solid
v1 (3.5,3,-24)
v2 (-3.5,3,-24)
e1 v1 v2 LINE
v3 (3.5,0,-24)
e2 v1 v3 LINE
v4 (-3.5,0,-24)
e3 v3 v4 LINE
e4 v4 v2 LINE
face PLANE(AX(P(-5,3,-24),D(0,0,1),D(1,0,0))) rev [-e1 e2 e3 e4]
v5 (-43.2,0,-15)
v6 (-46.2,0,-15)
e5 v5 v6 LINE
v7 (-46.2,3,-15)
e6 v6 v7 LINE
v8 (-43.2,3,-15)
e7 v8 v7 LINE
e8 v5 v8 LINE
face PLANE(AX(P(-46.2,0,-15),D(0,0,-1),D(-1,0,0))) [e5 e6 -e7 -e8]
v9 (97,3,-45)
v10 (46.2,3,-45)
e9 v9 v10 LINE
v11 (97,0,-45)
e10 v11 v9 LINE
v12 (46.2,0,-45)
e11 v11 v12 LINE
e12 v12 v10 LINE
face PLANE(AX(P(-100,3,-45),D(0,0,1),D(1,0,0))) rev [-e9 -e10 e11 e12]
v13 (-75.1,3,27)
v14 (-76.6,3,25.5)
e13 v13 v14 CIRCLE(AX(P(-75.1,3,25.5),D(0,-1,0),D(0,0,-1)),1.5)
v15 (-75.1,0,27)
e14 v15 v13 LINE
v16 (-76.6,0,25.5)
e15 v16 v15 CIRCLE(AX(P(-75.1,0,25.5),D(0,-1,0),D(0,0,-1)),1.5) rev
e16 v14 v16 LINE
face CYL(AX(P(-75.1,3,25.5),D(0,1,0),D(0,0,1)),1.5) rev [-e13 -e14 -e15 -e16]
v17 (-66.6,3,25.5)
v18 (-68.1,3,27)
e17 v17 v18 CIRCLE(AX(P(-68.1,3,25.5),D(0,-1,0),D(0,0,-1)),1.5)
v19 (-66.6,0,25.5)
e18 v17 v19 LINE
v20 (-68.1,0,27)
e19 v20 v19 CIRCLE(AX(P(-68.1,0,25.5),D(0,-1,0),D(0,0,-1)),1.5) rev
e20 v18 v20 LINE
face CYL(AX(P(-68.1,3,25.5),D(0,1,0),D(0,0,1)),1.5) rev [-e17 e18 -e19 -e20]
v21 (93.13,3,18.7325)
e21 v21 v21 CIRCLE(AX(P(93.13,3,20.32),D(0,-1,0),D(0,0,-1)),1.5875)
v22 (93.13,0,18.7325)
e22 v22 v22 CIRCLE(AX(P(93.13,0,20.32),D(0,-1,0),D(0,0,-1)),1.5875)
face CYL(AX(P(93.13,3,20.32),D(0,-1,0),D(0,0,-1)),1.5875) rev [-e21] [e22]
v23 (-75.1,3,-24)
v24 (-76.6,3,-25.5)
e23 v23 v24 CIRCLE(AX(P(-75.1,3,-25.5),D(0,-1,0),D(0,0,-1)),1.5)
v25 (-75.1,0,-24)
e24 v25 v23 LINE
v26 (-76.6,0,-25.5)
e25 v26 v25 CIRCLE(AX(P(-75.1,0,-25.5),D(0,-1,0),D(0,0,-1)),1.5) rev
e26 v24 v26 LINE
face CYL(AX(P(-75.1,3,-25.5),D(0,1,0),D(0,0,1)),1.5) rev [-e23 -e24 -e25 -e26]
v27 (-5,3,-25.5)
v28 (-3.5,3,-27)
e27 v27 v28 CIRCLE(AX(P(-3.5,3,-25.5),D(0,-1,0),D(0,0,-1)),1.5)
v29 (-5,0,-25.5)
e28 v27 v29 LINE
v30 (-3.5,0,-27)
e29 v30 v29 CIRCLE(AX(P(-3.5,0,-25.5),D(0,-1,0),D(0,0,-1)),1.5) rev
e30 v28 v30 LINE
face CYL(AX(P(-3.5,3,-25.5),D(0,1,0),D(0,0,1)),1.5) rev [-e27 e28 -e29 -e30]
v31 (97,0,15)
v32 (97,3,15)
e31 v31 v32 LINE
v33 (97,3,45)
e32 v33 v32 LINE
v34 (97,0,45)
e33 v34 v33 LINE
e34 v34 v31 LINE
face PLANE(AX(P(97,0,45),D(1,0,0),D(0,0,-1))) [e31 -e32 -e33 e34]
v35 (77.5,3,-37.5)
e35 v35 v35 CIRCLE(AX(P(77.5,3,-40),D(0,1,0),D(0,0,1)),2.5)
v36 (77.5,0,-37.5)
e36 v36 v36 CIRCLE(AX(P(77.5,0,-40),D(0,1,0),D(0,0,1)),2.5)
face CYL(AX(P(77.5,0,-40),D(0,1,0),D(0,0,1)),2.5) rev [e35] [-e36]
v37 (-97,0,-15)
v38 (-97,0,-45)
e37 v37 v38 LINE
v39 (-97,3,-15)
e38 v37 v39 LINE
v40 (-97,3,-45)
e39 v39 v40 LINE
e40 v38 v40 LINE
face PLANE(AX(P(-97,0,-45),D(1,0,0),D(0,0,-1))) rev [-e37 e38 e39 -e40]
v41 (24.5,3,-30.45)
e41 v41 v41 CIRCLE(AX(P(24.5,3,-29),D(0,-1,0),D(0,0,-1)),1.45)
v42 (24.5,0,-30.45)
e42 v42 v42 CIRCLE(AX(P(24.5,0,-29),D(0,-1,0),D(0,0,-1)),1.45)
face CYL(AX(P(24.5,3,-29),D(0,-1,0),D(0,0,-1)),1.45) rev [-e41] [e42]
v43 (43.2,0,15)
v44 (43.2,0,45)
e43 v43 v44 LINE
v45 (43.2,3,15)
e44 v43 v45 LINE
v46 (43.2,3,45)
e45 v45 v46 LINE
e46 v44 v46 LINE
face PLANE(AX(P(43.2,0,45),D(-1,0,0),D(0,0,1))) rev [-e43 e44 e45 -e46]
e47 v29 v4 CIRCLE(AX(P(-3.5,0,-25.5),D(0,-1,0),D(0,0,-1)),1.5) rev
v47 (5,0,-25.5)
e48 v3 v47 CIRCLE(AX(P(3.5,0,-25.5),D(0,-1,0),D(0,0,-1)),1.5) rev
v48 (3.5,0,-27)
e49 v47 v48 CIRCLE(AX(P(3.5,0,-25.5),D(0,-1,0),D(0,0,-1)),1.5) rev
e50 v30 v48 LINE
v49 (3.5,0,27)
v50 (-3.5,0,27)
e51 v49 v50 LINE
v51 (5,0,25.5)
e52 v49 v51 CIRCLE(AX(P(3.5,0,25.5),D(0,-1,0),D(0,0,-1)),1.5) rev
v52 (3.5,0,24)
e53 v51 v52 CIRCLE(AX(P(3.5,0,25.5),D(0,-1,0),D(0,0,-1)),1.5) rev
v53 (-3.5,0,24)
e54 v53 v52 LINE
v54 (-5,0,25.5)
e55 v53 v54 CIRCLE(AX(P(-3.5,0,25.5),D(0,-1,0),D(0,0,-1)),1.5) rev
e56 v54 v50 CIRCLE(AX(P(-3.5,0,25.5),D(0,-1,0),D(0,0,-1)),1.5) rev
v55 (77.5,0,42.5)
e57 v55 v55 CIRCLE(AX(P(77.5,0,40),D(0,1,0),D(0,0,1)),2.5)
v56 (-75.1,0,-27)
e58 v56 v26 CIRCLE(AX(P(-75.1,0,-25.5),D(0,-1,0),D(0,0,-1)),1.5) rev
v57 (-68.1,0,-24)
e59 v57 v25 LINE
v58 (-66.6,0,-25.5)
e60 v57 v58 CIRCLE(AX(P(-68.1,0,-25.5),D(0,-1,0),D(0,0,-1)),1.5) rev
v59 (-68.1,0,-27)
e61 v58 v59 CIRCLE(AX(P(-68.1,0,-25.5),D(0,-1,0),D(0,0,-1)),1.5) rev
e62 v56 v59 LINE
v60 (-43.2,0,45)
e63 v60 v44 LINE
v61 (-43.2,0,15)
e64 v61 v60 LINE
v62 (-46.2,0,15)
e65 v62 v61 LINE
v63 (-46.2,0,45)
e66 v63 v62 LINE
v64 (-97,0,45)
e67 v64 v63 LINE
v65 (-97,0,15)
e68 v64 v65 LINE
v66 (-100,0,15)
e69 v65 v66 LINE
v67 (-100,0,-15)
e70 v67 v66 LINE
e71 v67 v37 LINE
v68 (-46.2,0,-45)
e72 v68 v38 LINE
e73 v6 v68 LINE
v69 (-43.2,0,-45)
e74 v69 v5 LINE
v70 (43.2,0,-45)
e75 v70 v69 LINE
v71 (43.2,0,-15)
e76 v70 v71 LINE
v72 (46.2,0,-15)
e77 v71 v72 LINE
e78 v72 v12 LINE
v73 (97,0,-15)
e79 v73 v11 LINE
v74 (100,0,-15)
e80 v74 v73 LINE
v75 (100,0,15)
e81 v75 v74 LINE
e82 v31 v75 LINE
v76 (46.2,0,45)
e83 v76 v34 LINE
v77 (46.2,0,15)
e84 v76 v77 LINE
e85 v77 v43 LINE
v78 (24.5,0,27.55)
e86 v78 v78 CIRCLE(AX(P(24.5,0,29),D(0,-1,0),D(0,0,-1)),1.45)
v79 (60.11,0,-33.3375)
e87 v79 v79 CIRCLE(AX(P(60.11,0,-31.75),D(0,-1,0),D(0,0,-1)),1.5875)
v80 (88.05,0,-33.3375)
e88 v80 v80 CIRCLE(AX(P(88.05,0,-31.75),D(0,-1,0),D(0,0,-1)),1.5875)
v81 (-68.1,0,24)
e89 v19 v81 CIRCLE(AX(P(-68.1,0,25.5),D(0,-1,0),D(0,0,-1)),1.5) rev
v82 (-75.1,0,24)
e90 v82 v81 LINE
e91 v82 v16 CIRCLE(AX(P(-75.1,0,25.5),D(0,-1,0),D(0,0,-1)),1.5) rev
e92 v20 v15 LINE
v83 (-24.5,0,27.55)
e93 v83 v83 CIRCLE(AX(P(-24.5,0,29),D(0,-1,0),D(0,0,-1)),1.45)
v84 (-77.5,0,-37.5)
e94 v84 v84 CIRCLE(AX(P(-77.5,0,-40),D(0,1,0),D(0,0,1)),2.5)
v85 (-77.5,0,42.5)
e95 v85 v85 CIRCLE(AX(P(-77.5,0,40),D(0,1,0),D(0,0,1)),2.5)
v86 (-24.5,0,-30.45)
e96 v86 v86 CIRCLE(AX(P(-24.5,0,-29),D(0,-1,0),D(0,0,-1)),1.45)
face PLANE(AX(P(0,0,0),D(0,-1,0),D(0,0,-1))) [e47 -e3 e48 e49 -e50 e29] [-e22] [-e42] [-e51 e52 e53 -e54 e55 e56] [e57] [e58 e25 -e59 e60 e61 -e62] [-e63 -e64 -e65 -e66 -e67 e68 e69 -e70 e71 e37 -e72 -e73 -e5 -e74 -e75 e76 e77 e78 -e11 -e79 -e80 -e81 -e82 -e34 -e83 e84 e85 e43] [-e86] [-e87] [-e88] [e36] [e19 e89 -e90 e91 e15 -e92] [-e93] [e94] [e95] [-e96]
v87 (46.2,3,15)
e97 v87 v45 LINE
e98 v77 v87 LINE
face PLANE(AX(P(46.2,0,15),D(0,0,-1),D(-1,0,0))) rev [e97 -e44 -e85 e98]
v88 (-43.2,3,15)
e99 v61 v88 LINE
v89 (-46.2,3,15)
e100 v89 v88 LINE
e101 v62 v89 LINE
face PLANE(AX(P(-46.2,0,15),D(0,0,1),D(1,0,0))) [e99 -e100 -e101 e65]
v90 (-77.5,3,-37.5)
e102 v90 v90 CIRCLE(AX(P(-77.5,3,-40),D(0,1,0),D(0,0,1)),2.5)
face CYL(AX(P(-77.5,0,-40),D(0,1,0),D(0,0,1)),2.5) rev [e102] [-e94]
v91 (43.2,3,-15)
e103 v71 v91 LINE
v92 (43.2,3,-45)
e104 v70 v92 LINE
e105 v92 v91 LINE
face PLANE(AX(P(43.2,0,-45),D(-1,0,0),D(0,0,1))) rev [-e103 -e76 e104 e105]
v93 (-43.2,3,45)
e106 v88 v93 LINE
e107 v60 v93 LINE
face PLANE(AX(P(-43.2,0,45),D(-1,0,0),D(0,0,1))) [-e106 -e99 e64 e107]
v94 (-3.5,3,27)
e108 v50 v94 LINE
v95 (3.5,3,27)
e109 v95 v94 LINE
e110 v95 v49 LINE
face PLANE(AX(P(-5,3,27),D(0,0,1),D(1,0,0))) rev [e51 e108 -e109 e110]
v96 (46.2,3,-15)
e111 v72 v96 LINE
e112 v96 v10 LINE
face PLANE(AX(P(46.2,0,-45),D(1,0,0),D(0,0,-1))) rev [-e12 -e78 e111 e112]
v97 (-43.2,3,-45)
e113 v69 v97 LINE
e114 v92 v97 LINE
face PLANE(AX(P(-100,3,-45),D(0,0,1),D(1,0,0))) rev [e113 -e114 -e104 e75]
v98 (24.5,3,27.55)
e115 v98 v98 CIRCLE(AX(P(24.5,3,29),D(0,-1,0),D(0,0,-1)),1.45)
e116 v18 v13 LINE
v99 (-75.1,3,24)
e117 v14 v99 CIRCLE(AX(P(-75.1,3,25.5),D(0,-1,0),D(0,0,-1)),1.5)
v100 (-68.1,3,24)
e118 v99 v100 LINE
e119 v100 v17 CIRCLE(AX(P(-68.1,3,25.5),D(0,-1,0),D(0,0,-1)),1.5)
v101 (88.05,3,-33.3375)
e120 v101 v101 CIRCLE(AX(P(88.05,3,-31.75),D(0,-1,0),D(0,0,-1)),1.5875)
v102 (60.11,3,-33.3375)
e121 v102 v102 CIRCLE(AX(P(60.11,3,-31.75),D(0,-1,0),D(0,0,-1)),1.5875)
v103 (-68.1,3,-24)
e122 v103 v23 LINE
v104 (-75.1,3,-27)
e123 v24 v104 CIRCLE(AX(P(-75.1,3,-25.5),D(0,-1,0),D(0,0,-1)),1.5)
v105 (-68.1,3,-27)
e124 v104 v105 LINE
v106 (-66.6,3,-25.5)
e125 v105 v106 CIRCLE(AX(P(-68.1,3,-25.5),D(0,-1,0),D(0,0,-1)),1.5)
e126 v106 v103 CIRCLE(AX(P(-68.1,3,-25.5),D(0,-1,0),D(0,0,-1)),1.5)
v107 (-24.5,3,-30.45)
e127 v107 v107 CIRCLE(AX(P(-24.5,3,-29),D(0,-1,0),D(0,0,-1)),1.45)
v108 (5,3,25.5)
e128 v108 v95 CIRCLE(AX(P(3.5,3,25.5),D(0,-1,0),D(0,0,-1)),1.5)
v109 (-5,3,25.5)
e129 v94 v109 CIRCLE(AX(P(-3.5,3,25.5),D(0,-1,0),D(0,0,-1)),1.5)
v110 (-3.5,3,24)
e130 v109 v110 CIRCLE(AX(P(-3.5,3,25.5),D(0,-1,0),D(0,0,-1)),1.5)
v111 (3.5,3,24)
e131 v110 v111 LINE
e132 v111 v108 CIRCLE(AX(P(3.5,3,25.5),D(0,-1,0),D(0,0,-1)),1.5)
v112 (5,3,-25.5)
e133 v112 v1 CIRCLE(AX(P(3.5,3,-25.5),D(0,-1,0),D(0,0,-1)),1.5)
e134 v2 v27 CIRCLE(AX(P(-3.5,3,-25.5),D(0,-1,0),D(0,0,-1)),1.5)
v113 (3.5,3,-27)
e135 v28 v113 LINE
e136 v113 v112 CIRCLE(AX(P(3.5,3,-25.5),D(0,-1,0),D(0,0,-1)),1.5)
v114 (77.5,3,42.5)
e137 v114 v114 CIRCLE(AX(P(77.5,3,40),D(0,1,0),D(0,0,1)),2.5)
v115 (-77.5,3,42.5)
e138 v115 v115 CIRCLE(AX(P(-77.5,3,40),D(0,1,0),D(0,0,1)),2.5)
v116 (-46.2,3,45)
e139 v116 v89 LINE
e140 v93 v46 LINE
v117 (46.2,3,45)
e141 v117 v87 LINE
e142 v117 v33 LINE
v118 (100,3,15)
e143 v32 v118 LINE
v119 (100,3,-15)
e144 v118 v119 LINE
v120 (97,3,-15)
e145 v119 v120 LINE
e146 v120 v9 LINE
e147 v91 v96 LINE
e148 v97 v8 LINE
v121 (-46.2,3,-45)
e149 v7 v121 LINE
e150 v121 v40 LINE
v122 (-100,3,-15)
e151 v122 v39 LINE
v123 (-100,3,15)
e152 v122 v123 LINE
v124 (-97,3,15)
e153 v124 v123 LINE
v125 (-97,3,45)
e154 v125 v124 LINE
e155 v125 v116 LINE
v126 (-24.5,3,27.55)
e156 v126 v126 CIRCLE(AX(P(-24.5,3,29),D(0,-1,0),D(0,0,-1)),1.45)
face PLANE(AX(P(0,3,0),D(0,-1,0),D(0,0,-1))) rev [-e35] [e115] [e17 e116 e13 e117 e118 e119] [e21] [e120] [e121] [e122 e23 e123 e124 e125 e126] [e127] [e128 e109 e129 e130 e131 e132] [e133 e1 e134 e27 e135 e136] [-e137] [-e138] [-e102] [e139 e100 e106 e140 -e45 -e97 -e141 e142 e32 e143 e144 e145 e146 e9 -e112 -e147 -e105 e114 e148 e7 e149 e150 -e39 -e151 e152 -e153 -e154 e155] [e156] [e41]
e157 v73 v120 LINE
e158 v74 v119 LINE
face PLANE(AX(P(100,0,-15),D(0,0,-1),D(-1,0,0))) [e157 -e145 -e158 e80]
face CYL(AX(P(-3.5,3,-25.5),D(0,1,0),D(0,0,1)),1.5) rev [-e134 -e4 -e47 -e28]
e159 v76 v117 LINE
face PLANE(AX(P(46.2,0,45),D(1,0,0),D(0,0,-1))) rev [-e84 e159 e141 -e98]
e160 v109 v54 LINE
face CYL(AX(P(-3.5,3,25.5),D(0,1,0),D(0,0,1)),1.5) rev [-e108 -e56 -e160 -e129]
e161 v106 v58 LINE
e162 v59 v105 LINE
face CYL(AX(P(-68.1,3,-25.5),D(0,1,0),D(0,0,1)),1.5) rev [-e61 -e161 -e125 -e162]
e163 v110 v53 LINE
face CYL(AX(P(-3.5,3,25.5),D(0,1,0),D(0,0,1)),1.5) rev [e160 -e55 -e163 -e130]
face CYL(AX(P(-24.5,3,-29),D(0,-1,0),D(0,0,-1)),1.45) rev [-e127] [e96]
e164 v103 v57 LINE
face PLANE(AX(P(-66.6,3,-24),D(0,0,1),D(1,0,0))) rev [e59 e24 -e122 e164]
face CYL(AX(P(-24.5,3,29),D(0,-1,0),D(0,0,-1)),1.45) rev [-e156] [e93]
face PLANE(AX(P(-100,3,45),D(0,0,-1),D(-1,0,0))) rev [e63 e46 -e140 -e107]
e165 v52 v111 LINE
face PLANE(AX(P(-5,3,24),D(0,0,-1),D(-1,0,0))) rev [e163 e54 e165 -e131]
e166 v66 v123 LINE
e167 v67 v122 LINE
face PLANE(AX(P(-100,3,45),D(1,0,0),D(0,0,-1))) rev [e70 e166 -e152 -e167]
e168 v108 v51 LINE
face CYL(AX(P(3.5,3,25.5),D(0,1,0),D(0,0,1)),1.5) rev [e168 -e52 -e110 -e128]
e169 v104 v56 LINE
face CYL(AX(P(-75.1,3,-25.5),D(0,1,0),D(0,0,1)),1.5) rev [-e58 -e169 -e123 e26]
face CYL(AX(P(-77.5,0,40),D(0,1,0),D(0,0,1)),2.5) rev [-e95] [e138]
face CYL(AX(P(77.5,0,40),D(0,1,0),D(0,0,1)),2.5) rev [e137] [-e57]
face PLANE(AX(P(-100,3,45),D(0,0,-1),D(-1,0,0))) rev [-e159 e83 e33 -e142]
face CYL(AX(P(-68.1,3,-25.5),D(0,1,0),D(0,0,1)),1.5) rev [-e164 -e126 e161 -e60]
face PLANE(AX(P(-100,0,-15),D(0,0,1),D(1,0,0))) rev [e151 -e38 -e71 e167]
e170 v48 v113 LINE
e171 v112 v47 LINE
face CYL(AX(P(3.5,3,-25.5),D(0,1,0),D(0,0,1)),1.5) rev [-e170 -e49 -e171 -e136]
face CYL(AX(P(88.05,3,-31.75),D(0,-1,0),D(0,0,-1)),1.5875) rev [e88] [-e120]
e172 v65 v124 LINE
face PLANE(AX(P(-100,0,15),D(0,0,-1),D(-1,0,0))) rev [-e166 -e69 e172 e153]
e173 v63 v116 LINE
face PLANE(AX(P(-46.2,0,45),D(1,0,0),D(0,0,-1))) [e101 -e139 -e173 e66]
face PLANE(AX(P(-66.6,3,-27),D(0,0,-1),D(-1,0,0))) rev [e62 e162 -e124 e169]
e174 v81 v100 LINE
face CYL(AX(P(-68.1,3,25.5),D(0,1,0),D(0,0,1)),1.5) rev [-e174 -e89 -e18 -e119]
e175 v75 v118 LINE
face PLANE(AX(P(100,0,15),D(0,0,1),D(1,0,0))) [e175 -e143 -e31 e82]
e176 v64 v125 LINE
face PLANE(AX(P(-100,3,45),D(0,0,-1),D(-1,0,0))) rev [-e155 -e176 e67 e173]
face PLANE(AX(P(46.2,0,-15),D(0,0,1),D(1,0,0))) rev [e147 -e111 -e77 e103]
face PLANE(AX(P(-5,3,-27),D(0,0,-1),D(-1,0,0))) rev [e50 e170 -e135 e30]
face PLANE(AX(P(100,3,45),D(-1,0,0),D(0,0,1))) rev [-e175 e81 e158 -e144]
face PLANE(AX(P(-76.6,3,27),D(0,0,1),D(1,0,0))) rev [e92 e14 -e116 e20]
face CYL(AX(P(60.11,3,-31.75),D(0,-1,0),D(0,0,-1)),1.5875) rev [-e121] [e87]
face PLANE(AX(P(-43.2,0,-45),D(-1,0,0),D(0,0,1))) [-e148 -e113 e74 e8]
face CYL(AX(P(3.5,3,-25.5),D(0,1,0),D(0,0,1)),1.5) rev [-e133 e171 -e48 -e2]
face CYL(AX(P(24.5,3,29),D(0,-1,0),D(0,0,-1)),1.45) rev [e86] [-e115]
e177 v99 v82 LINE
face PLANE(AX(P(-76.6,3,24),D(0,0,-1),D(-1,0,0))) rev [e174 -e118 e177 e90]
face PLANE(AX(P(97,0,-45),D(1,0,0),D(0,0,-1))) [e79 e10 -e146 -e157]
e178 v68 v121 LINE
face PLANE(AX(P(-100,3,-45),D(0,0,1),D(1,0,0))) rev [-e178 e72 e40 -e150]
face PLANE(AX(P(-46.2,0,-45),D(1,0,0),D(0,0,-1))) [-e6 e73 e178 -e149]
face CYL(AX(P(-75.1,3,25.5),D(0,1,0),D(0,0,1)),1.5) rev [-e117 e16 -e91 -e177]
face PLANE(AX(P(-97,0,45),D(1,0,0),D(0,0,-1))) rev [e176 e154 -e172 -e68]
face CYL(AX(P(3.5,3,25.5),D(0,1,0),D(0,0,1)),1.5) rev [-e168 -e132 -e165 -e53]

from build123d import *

# Parameters (mm, degrees)
SKETCH1_W           = 200
SKETCH1_H           = 90
BOSS_EXTRUDE1_DEPTH = 3
SKETCH2_W           = 3
SKETCH2_H           = 30
CUT_EXTRUDE1_DEPTH  = 110.69958979
SKETCH3_W           = 3
SKETCH3_H           = 30
CUT_EXTRUDE2_DEPTH  = 110.69958979
SKETCH4_R           = 1.45
SKETCH4_R_2         = 1.5875
SKETCH4_W           = 10
SKETCH4_H           = 3
CUT_EXTRUDE3_DEPTH  = 110.69958979
FILLET1_R           = 1.5
SKETCH5_R           = 2.5
CUT_EXTRUDE4_DEPTH  = 110.69958979


with BuildPart() as part:
    # Sketch1 → Boss-Extrude1 (new body)
    with BuildSketch(Plane(origin=(0, 0, 0), x_dir=(1, 0, 0), z_dir=(0, 1, 0))):
        Rectangle(SKETCH1_W, SKETCH1_H)
    extrude(amount=BOSS_EXTRUDE1_DEPTH)

    # Sketch2 → Cut-Extrude1 (cut, through all)
    with BuildSketch(Plane(origin=(0, 3, 0), x_dir=(1, 0, 0), z_dir=(0, 1, 0))):
        with Locations((-98.5, 30)):
            Rectangle(SKETCH2_W, SKETCH2_H)
        with Locations((-98.5, -30)):
            Rectangle(SKETCH2_W, SKETCH2_H)
    cut_extrude1 = extrude(amount=-CUT_EXTRUDE1_DEPTH, mode=Mode.SUBTRACT)

    # Mirror1: Cut-Extrude1 across plane
    add(cut_extrude1.mirror(Plane(origin=(0, 0, 0), x_dir=(0, 0, 1), z_dir=(1, 0, 0))), mode=Mode.SUBTRACT)

    # Sketch3 → Cut-Extrude2 (cut, through all)
    with BuildSketch(Plane(origin=(0, 3, 0), x_dir=(1, 0, 0), z_dir=(0, 1, 0))):
        with Locations((44.7, 30)):
            Rectangle(SKETCH3_W, SKETCH3_H)
        with Locations((44.7, -30)):
            Rectangle(SKETCH3_W, SKETCH3_H)
    cut_extrude2 = extrude(amount=-CUT_EXTRUDE2_DEPTH, mode=Mode.SUBTRACT)

    # Mirror2: Cut-Extrude2 across plane
    add(cut_extrude2.mirror(Plane(origin=(0, 0, 0), x_dir=(0, 0, 1), z_dir=(1, 0, 0))), mode=Mode.SUBTRACT)

    # Sketch4 → Cut-Extrude3 (cut, through all)
    with BuildSketch(Plane.XZ):
        with Locations(Location((-24.5, 29, 0), (0, 0, 270))):
            Circle(SKETCH4_R)
        with Locations(Location((24.5, 29, 0), (0, 0, 270))):
            Circle(SKETCH4_R)
        with Locations(Location((24.5, -29, 0), (0, 0, 270))):
            Circle(SKETCH4_R)
        with Locations(Location((-24.5, -29, 0), (0, 0, 270))):
            Circle(SKETCH4_R)
        with Locations(Location((93.13, 20.32, 0), (0, 0, 270))):
            Circle(SKETCH4_R_2)
        with Locations(Location((60.11, -31.75, 0), (0, 0, 270))):
            Circle(SKETCH4_R_2)
        with Locations(Location((88.05, -31.75, 0), (0, 0, 270))):
            Circle(SKETCH4_R_2)
        with Locations((0, 25.5)):
            Rectangle(SKETCH4_W, SKETCH4_H)
        with Locations((0, -25.5)):
            Rectangle(SKETCH4_W, SKETCH4_H)
        with Locations((-71.6, 25.5)):
            Rectangle(SKETCH4_W, SKETCH4_H)
        with Locations((-71.6, -25.5)):
            Rectangle(SKETCH4_W, SKETCH4_H)
    extrude(amount=-CUT_EXTRUDE3_DEPTH, mode=Mode.SUBTRACT)

    # Fillet1
    fillet1_edges = [part.edges().sort_by_distance(p)[0] for p in [
        (-5, 1.5, -27),
        (-5, 1.5, -24),
        (5, 1.5, -24),
        (5, 1.5, -27),
        (-5, 1.5, 24),
        (-5, 1.5, 27),
        (5, 1.5, 27),
        (5, 1.5, 24),
        (-76.6, 1.5, 24),
        (-76.6, 1.5, 27),
        (-66.6, 1.5, 27),
        (-66.6, 1.5, -24),
        (-66.6, 1.5, -27),
        (-76.6, 1.5, -27),
        (-76.6, 1.5, -24),
        (-66.6, 1.5, 24),
    ]]
    fillet(fillet1_edges, radius=FILLET1_R - 0.0001)  # a hair under: the kernel refuses the full size

    # Sketch5 → Cut-Extrude4 (cut, through all)
    with BuildSketch(Plane(origin=(0, 3, 0), x_dir=(1, 0, 0), z_dir=(0, 1, 0))):
        with Locations(Location((-77.5, 40, 0), (0, 0, 270))):
            Circle(SKETCH5_R)
        with Locations(Location((77.5, 40, 0), (0, 0, 270))):
            Circle(SKETCH5_R)
        with Locations(Location((77.5, -40, 0), (0, 0, 270))):
            Circle(SKETCH5_R)
        with Locations(Location((-77.5, -40, 0), (0, 0, 270))):
            Circle(SKETCH5_R)
    extrude(amount=-CUT_EXTRUDE4_DEPTH, mode=Mode.SUBTRACT)


solid = part.part
